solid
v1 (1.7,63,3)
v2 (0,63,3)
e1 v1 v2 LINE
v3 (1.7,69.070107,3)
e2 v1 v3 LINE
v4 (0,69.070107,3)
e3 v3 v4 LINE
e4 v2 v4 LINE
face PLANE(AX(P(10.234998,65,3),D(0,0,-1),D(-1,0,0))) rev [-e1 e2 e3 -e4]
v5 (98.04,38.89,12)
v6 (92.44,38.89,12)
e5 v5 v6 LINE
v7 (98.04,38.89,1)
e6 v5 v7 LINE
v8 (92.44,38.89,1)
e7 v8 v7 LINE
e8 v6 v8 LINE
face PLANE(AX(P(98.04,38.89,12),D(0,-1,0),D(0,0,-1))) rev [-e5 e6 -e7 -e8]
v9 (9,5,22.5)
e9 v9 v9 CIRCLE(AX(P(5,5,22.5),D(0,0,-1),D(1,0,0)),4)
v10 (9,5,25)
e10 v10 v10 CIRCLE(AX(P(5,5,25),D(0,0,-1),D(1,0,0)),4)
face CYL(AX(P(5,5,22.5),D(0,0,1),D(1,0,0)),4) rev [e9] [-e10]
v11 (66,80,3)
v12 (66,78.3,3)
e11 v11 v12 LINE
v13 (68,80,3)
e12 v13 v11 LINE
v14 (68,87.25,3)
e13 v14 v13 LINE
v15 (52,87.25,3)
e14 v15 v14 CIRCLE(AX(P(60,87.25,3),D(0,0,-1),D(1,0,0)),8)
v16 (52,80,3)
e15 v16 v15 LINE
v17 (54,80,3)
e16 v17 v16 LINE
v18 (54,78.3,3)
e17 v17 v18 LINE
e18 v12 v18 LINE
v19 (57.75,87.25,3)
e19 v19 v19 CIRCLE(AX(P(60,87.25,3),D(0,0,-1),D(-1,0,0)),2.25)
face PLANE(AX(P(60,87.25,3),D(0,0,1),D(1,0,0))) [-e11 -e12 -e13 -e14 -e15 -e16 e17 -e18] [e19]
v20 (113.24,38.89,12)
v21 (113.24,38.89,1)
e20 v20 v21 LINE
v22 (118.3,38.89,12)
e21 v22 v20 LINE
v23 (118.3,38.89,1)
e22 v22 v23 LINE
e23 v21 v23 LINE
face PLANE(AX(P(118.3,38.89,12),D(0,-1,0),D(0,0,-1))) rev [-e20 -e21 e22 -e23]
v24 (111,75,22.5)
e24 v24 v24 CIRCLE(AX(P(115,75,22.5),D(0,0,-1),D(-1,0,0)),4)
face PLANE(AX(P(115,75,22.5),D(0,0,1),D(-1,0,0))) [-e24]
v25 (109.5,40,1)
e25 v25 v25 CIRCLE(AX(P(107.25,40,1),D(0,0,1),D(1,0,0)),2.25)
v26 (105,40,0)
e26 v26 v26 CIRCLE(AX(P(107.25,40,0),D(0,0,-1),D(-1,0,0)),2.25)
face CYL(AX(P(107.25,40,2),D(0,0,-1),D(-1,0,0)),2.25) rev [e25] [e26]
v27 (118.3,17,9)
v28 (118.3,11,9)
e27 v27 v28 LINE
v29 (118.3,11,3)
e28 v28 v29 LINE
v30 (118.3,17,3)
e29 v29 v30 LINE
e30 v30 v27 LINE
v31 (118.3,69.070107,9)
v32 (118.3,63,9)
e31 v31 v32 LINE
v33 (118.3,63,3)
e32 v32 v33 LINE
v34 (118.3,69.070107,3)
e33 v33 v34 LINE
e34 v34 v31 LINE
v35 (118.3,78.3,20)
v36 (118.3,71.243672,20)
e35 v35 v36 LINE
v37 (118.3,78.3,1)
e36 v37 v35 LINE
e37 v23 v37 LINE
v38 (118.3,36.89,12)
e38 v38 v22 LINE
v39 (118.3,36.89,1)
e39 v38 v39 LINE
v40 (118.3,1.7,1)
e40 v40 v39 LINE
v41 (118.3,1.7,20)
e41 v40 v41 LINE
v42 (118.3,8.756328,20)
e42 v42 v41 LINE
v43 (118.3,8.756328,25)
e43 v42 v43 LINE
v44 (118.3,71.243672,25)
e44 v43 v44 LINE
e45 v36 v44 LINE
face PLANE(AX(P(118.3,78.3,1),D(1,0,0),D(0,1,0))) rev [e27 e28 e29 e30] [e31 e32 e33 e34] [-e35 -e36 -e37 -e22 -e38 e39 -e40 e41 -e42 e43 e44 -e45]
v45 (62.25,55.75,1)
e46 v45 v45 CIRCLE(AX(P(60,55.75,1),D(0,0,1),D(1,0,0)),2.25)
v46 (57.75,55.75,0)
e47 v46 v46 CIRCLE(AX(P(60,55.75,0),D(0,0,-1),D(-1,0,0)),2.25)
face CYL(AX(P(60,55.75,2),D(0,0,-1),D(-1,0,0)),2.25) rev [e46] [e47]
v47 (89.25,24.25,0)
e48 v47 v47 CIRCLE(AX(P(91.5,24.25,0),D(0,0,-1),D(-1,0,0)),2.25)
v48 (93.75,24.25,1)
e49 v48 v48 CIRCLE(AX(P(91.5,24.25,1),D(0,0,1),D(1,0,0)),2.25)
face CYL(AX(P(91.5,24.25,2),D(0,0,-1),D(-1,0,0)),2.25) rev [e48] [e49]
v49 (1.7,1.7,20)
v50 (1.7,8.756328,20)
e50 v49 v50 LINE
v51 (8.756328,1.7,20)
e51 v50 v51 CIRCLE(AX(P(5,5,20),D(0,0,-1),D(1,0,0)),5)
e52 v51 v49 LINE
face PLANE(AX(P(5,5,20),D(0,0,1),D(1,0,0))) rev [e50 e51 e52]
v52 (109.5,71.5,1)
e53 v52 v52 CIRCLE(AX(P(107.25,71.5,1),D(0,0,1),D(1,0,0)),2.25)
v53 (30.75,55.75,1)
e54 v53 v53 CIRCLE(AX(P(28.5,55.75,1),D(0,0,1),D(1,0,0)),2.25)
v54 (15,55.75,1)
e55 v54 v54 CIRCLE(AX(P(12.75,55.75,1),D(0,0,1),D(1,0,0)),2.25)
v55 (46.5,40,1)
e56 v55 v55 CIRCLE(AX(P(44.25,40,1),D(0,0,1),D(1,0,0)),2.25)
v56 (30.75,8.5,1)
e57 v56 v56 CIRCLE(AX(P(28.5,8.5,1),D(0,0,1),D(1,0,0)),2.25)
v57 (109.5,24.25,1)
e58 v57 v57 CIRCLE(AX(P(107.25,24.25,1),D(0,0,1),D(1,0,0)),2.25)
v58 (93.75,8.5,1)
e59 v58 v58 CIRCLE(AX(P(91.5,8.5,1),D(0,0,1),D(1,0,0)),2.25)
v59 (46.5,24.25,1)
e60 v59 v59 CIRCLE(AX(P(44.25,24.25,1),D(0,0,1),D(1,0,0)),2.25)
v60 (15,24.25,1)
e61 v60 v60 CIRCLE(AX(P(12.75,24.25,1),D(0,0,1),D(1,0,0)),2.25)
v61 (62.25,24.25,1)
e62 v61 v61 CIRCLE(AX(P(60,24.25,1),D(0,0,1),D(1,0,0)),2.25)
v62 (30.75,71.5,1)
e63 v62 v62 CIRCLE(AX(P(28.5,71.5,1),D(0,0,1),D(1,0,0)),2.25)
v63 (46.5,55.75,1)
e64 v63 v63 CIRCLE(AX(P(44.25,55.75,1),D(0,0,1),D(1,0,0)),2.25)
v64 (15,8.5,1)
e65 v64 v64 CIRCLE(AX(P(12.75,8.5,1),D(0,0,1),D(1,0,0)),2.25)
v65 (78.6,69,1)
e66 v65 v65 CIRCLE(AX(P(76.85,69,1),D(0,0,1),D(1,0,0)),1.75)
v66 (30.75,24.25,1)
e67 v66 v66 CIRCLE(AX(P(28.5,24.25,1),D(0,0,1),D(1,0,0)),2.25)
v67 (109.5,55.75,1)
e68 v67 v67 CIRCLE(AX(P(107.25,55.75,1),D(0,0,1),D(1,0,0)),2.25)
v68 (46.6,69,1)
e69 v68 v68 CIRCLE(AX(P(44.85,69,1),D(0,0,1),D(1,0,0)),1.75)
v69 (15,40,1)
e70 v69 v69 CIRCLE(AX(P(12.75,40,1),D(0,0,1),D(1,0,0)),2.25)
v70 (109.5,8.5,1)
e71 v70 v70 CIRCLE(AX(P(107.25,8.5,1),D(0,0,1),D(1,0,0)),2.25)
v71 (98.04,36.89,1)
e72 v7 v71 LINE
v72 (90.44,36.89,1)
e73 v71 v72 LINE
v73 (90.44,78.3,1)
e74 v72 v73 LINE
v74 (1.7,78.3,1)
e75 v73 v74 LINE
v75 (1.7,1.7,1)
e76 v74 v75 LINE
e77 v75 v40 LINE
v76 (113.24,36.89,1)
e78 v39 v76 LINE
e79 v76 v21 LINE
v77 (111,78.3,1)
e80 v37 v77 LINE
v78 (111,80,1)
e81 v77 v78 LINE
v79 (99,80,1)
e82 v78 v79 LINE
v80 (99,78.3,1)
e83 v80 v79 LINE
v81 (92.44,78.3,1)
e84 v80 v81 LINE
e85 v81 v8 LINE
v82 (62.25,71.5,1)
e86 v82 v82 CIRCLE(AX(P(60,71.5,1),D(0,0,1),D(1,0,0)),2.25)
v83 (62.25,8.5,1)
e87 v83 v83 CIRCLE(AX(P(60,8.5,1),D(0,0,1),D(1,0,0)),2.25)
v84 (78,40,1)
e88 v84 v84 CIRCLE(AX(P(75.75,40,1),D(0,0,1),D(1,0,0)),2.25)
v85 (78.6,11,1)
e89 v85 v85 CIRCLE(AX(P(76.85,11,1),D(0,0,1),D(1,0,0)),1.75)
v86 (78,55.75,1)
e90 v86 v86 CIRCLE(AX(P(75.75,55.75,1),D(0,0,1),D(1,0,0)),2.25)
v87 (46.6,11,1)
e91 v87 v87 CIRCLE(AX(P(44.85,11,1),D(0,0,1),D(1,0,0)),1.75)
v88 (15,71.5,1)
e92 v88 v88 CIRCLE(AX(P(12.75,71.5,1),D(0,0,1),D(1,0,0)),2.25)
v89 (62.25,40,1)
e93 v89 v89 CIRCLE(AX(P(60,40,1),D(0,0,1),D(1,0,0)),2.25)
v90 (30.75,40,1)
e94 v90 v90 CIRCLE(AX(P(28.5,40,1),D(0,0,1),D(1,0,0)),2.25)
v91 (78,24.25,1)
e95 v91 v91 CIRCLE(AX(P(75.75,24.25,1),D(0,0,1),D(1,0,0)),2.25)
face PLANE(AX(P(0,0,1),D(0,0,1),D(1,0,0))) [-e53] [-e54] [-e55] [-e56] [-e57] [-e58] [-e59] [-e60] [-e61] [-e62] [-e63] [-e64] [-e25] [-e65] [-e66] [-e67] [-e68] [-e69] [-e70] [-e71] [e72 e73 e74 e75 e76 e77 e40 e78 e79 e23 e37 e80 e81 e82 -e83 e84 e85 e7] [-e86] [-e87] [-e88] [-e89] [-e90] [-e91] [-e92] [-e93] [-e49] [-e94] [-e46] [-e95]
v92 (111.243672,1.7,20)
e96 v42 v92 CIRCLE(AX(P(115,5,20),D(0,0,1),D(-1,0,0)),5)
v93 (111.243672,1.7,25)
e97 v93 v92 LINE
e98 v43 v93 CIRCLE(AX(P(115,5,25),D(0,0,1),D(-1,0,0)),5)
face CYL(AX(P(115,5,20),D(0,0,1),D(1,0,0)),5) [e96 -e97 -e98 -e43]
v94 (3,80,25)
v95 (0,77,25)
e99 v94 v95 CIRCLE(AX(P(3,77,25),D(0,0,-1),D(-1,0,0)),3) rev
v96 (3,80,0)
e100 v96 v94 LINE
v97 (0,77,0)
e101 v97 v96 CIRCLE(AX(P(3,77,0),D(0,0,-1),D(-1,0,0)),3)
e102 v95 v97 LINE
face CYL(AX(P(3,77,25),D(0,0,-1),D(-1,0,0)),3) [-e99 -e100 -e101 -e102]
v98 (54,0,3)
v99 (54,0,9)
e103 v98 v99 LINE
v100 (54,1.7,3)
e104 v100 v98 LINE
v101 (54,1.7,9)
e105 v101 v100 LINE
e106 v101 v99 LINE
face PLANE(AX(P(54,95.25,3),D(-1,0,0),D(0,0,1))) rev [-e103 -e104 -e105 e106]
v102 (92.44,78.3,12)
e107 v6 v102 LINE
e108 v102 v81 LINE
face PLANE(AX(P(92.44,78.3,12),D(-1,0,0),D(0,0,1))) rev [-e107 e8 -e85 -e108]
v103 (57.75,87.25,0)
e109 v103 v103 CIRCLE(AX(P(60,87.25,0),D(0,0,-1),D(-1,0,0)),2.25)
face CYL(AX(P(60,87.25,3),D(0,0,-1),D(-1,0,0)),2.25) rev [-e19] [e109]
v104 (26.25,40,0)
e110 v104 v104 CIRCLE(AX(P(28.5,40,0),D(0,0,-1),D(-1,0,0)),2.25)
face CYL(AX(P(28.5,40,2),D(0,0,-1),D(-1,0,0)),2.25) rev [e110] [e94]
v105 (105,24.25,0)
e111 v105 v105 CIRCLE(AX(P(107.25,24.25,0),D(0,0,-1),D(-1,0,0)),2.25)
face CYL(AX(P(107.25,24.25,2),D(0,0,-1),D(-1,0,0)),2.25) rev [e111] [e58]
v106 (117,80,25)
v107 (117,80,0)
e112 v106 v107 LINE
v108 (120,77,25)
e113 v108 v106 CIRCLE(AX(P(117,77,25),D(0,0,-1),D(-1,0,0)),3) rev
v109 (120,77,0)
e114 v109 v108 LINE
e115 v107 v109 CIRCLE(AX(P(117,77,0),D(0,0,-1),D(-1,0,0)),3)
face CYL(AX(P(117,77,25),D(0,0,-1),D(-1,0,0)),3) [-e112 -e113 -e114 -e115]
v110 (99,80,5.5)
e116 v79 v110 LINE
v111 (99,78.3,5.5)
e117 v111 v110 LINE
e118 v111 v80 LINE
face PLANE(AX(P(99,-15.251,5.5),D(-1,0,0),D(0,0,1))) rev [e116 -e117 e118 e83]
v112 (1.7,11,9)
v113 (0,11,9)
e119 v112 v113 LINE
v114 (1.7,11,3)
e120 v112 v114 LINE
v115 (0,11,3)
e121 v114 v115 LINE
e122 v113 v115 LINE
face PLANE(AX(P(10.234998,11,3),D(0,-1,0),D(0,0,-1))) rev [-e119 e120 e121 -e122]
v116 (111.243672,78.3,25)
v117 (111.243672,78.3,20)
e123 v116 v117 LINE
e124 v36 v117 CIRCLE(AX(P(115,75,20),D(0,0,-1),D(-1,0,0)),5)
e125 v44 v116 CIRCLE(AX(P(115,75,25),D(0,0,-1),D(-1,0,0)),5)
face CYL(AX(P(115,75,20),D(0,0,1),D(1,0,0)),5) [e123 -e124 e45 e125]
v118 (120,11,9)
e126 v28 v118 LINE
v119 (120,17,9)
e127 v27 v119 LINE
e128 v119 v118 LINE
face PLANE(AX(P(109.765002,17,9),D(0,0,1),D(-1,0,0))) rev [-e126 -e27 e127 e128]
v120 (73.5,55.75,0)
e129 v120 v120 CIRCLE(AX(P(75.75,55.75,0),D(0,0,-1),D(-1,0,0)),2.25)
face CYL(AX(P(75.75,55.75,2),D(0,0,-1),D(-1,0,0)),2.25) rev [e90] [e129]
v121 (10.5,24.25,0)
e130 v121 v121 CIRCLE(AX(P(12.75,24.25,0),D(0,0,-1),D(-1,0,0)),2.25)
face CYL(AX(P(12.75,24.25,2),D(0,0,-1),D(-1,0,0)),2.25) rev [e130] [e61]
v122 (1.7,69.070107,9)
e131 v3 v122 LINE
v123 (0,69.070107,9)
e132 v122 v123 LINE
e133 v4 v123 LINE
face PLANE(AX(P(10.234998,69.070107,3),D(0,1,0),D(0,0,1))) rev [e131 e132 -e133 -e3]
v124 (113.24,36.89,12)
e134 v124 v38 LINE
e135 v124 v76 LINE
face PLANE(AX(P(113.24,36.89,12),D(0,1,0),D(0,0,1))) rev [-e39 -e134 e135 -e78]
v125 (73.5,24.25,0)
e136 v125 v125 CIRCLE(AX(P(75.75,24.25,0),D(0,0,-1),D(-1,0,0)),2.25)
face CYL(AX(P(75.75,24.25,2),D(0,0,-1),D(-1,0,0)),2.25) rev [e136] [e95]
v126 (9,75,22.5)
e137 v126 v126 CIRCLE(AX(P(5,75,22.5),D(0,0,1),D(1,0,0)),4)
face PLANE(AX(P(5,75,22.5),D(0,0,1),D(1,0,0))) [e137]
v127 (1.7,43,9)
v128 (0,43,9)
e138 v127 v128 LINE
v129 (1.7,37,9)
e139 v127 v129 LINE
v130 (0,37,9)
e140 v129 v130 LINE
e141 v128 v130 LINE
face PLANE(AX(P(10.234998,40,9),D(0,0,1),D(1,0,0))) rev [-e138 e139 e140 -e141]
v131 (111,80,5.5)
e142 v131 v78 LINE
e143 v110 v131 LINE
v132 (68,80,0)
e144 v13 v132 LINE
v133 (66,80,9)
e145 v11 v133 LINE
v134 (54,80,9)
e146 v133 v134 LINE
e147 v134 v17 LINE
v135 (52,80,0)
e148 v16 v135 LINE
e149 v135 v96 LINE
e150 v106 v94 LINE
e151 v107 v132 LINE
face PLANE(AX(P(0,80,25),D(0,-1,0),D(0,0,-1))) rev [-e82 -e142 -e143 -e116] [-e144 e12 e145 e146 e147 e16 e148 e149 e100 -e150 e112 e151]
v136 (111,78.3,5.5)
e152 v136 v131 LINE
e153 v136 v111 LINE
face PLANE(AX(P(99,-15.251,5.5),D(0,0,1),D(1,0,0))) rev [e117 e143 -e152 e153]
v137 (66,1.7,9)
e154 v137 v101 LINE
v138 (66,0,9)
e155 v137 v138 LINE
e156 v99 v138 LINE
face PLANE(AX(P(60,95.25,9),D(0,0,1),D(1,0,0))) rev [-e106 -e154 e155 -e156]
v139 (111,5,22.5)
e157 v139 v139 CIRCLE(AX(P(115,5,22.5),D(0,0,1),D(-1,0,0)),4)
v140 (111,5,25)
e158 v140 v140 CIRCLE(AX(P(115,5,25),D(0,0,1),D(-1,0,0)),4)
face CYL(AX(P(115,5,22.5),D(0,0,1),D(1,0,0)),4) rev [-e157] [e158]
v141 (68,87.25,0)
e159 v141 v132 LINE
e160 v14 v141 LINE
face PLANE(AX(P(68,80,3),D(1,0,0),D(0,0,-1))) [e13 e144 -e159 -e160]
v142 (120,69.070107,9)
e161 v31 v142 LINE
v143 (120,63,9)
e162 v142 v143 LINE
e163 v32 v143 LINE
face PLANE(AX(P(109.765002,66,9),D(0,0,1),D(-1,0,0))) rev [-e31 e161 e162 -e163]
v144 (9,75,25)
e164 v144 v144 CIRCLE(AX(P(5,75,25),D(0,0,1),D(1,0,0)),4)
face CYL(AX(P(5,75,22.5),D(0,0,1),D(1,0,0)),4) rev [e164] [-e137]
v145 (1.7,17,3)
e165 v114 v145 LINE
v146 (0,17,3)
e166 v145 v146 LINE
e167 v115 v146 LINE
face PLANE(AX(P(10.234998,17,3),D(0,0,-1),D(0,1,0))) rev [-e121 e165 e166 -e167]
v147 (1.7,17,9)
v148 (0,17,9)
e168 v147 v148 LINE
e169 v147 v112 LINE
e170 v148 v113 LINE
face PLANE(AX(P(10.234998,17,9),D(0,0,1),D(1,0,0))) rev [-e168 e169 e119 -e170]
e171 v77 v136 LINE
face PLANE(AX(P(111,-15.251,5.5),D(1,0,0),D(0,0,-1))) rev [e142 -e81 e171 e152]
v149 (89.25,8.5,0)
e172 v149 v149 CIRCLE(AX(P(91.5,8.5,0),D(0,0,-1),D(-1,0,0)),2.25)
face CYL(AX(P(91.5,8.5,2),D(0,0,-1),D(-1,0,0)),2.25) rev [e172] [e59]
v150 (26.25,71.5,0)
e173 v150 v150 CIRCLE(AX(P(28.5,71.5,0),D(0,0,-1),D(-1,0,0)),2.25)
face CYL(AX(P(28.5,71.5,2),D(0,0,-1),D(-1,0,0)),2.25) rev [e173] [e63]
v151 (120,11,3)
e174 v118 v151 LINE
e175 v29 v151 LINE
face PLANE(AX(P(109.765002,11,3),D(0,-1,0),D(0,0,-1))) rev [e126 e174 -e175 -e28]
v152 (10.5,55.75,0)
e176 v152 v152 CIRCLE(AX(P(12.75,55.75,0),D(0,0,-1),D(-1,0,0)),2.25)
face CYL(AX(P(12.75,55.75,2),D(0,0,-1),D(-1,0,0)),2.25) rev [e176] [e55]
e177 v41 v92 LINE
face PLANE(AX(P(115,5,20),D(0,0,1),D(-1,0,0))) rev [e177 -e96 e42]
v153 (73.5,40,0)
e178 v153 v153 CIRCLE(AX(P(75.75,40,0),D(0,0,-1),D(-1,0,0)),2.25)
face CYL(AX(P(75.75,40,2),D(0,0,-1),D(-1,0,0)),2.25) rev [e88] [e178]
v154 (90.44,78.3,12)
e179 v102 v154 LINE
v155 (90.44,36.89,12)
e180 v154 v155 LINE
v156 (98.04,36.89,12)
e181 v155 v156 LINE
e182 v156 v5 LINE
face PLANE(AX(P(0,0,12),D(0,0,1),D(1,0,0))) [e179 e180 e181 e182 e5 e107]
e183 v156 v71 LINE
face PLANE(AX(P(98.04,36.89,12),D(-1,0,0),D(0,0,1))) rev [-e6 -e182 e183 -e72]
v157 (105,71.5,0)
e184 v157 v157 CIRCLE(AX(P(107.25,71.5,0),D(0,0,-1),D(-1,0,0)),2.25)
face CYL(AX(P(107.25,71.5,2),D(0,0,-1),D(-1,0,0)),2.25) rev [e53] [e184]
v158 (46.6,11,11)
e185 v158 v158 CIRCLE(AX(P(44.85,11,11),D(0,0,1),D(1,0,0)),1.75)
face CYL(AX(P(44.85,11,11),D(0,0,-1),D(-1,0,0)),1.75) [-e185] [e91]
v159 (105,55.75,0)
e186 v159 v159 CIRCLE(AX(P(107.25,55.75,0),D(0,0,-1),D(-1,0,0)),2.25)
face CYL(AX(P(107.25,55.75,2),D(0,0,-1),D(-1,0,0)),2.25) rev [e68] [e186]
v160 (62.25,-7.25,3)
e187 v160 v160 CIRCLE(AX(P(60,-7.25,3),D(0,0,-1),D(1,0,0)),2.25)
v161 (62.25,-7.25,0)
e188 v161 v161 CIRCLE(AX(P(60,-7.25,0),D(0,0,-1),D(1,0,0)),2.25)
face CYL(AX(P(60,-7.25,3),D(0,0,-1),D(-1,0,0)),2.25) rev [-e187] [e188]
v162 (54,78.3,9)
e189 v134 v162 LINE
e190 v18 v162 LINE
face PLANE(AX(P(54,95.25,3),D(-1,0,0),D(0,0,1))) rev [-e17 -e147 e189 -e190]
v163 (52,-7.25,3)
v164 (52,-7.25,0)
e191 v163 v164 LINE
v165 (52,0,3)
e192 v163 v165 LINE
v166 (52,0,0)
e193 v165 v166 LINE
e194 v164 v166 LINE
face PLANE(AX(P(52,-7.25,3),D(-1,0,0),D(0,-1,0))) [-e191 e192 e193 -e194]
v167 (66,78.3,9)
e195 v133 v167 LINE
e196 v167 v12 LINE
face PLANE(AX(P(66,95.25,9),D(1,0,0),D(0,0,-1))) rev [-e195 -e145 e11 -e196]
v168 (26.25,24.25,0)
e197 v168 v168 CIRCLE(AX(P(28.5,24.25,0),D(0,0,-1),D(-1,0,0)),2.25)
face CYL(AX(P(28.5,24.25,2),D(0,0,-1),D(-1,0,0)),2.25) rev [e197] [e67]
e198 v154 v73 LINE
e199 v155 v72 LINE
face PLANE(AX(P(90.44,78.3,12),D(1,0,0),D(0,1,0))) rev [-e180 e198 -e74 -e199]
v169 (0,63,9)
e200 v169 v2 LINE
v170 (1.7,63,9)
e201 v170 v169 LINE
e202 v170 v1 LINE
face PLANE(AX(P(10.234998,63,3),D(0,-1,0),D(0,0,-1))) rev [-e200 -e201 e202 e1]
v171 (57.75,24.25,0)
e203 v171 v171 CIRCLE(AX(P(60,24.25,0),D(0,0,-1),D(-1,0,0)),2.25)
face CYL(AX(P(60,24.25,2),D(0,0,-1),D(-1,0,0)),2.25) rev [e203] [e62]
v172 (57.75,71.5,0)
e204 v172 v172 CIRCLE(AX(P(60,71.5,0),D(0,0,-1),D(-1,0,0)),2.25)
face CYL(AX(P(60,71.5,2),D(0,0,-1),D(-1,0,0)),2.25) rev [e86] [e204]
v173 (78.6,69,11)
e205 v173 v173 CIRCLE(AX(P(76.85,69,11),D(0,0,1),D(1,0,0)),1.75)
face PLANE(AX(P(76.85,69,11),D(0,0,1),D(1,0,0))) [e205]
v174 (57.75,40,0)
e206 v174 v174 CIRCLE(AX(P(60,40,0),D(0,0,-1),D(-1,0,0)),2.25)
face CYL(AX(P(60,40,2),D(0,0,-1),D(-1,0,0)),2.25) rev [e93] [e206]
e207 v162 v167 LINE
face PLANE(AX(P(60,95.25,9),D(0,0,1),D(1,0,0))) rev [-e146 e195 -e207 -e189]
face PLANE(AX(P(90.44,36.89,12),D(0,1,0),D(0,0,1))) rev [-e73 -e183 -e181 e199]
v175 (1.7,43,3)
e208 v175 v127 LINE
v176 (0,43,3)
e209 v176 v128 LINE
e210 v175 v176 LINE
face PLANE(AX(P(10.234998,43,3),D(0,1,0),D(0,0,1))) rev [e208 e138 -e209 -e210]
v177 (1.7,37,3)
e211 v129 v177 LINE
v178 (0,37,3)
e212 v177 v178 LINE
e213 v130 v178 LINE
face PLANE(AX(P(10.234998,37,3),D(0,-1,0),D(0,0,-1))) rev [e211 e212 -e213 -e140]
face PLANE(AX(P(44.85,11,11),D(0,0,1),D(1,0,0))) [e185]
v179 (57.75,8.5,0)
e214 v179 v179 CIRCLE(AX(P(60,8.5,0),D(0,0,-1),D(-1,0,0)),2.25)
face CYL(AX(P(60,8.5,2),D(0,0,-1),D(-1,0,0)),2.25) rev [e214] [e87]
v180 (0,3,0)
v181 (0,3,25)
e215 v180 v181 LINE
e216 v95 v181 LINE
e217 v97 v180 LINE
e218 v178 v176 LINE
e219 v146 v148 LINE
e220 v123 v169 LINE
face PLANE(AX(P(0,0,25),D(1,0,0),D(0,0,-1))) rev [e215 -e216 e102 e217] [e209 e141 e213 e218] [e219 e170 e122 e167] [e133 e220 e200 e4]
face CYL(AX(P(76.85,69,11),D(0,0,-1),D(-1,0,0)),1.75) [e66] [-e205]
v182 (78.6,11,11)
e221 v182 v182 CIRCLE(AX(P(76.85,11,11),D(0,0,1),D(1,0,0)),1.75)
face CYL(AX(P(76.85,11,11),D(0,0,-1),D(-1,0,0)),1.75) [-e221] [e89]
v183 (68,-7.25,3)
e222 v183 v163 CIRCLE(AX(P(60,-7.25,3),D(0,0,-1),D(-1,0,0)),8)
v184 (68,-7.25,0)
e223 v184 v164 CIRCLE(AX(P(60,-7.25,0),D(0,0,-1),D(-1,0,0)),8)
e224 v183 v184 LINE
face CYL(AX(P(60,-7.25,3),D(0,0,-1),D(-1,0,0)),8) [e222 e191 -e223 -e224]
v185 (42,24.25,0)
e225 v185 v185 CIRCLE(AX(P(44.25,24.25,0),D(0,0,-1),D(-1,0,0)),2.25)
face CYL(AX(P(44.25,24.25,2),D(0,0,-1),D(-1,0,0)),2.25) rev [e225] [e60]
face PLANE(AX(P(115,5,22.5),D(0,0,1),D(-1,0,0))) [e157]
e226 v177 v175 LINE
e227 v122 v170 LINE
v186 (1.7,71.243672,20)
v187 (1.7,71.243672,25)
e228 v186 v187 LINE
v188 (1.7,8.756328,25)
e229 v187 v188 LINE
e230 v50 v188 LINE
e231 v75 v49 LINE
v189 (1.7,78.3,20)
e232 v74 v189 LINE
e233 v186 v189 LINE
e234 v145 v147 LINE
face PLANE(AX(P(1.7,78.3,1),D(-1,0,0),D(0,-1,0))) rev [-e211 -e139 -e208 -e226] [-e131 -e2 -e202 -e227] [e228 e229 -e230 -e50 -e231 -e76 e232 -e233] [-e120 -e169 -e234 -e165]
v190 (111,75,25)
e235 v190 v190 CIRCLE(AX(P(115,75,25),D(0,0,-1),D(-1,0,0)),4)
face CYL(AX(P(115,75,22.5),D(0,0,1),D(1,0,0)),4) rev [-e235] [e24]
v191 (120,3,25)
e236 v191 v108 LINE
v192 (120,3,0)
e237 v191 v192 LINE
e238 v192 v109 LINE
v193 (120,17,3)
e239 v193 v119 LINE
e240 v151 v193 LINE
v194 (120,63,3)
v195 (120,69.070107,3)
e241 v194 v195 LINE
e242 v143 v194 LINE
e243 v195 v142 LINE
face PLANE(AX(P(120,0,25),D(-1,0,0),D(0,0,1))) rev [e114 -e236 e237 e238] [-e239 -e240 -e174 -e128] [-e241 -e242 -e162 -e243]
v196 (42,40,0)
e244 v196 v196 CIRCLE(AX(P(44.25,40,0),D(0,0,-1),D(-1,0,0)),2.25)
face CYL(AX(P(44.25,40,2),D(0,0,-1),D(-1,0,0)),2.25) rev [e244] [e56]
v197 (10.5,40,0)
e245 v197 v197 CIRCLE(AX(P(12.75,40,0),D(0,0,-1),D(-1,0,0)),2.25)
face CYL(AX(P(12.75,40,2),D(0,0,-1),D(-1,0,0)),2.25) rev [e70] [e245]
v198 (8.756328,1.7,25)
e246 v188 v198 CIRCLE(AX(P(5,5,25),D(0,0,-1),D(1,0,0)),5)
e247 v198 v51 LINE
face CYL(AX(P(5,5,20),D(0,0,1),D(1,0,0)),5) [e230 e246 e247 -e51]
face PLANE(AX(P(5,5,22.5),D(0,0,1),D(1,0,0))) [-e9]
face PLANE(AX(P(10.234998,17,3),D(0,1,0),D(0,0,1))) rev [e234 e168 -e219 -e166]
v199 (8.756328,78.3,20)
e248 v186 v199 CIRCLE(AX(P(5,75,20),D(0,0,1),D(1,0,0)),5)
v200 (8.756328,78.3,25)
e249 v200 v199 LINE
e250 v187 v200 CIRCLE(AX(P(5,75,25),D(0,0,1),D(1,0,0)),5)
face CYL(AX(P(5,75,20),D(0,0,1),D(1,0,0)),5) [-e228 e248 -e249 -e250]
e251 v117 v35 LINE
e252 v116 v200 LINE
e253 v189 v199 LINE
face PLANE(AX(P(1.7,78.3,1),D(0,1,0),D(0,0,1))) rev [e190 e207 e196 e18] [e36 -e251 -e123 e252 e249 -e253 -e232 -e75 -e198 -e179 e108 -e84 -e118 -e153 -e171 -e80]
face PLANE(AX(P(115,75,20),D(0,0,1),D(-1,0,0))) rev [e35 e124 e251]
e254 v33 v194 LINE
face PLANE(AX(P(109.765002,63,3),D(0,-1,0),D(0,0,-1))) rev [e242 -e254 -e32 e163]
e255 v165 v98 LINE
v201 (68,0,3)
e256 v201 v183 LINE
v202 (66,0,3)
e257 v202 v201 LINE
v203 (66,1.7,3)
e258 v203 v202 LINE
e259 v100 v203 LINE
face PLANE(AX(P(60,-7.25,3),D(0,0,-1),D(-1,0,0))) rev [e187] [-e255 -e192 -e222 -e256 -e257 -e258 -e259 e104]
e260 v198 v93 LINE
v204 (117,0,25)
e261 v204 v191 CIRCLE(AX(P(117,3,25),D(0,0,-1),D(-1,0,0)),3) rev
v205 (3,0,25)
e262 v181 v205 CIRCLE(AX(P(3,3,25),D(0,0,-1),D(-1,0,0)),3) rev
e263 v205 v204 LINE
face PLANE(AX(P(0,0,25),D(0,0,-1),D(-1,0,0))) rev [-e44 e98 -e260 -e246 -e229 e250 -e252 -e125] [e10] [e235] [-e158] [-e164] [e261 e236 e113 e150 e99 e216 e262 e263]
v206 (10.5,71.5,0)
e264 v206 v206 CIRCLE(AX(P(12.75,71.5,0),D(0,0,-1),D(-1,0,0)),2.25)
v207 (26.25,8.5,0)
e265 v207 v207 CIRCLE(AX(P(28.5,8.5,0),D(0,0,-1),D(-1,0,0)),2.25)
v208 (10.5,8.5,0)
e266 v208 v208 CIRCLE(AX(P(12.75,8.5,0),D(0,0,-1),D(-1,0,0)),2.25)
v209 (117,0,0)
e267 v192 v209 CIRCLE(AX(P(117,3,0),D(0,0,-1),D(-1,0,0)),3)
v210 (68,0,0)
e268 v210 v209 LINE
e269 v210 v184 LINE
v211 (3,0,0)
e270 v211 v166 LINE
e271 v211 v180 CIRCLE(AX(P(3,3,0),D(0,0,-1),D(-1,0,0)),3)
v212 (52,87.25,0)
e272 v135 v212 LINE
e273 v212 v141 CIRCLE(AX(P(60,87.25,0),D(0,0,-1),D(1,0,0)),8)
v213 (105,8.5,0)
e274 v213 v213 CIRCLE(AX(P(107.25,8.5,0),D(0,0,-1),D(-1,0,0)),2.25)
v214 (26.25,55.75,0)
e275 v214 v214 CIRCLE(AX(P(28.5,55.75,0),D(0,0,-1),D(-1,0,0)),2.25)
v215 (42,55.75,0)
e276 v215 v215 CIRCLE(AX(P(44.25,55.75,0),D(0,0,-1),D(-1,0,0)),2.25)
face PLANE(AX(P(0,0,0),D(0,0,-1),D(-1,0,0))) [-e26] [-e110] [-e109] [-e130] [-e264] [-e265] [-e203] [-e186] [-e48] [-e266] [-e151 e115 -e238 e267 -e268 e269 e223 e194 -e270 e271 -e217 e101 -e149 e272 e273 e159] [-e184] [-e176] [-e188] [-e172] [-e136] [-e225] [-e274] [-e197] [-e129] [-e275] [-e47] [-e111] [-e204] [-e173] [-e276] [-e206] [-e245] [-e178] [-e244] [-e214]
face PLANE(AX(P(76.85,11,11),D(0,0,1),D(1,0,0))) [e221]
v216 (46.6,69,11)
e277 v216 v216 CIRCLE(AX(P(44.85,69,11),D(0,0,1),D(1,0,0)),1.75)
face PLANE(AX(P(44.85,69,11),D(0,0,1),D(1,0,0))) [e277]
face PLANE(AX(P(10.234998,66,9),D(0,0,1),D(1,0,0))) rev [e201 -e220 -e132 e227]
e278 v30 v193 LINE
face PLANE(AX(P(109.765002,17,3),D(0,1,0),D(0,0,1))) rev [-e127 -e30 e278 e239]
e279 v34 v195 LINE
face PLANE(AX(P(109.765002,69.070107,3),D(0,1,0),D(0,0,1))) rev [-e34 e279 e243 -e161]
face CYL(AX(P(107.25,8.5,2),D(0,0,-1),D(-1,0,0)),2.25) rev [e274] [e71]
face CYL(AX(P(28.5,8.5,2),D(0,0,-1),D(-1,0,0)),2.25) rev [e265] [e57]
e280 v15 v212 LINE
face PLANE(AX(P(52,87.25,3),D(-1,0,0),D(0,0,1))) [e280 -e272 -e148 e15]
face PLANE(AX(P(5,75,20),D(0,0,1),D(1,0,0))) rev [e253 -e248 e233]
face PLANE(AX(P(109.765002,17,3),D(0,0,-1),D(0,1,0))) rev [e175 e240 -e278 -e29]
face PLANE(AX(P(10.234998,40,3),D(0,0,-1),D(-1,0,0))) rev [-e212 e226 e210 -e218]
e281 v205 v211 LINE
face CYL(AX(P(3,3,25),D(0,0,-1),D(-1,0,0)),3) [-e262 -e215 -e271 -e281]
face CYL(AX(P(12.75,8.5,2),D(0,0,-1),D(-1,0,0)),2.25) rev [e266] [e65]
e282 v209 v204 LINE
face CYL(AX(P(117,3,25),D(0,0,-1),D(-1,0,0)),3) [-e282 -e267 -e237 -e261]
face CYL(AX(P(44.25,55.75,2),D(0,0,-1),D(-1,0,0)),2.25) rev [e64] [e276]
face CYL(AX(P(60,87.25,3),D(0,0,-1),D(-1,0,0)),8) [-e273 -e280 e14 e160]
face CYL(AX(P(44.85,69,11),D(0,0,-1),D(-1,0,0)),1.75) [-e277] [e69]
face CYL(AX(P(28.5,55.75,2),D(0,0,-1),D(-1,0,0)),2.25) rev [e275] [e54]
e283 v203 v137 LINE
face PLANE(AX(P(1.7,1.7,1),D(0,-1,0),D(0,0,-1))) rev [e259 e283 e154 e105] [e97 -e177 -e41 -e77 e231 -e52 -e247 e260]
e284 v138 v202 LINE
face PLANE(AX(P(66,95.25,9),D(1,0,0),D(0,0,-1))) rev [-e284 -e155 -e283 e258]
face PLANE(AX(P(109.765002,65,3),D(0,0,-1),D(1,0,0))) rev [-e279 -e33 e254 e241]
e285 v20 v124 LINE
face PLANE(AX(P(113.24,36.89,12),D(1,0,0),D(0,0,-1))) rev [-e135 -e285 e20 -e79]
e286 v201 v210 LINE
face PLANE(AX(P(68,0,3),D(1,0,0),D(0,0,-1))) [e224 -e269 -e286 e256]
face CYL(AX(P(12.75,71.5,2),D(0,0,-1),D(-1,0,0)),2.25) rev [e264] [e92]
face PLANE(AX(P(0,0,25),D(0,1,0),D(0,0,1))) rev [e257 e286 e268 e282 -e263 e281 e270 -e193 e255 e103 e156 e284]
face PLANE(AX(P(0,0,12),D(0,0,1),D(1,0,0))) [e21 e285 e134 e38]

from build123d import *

# Parameters (mm, degrees)
SKETCH1_W               = 120
SKETCH1_H               = 80
BOSS_EXTRUDE1_DEPTH     = 25
SKETCH2_W               = 116.6
SKETCH2_H               = 76.6
CUT_EXTRUDE1_DEPTH      = 24
SKETCH4_R               = 2.25
BOSS_EXTRUDE3_DEPTH     = 3
SKETCH6_W               = 5.06
SKETCH6_H               = 2
BOSS_EXTRUDE4_DEPTH     = 12
SKETCH7_R               = 1.75
BOSS_EXTRUDE5_DEPTH     = 10
SKETCH8_R               = 5
BOSS_EXTRUDE6_DEPTH     = 5
SKETCH9_R               = 4
CUT_EXTRUDE2_DEPTH      = 2.5
MIRROR2_COPY_1_SKETCH_R = 5
MIRROR2_COPY_1_DEPTH    = 5
MIRROR2_COPY_2_SKETCH_R = 4
MIRROR2_COPY_2_DEPTH    = 2.5
FILLET1_R               = 3
SKETCH10_R              = 2.25
CUT_EXTRUDE3_DEPTH      = 2
CUT_EXTRUDE4_REACH      = 157.234
SKETCH11_W              = 12
SKETCH11_H              = 4.5
CUT_EXTRUDE5_DEPTH      = 156.233896105
CUT_EXTRUDE5_DEPTH_BACK = 156.233896105
CUT_EXTRUDE6_START      = -1.7
CUT_EXTRUDE6_DEPTH      = 157.933896105
MIRROR3_START           = 3
MIRROR3_OUTLINE_W       = 1.7
MIRROR3_OUTLINE_H       = 6.070107007
MIRROR3_OUTLINE_H_2     = 6
MIRROR3_DEPTH           = 6


# Read off the part's stored shape, not the designer's step: Mirror3
with BuildPart() as part:
    # Sketch1 → Boss-Extrude1 (new body)
    with BuildSketch(Plane.XY):
        with Locations((60, 40)):
            Rectangle(SKETCH1_W, SKETCH1_H)
    extrude(amount=BOSS_EXTRUDE1_DEPTH)

    # Sketch2 → Cut-Extrude1 (cut)
    with BuildSketch(Plane.XY.offset(25)):
        with Locations((60, 40)):
            Rectangle(SKETCH2_W, SKETCH2_H)
    extrude(amount=-CUT_EXTRUDE1_DEPTH, mode=Mode.SUBTRACT)

    # Sketch4 → Boss-Extrude3 (add)
    # profile 1 of 2: a face of its own
    with BuildSketch(Plane(origin=(0, 0, 0), x_dir=(-1, 0, 0), z_dir=(0, 0, -1))):
        with BuildLine():
            Line((-68, 80), (-68, 87.25))
            ThreePointArc((-68, 87.25), (-60, 95.25), (-52, 87.25))
            Line((-52, 87.25), (-52, 80))
            Line((-52, 80), (-68, 80))
        make_face()
        with Locations((-60, 87.25)):
            Circle(SKETCH4_R, mode=Mode.SUBTRACT)
    # profile 2 of 2: a face of its own
    with BuildSketch(Plane(origin=(0, 0, 0), x_dir=(-1, 0, 0), z_dir=(0, 0, -1))):
        with BuildLine():
            Line((-68, 0), (-68, -7.25))
            ThreePointArc((-68, -7.25), (-60, -15.25), (-52, -7.25))
            Line((-52, -7.25), (-52, 0))
            Line((-52, 0), (-68, 0))
        make_face()
        with Locations(Location((-60, -7.25, 0), (0, 0, 180))):
            Circle(SKETCH4_R, mode=Mode.SUBTRACT)
    extrude(amount=-BOSS_EXTRUDE3_DEPTH)

    # Sketch6 → Boss-Extrude4 (add)
    with BuildSketch(Plane.XY):
        Polygon((90.44, 78.3), (92.44, 78.3), (92.44, 38.89), (98.04, 38.89), (98.04, 36.89), (90.44, 36.89), align=None)
        with Locations((115.77, 37.89)):
            Rectangle(SKETCH6_W, SKETCH6_H)
    extrude(amount=BOSS_EXTRUDE4_DEPTH)

    # Sketch7 → Boss-Extrude5 (add)
    with BuildSketch(Plane.XY.offset(1)):
        with Locations((44.85, 69)):
            Circle(SKETCH7_R)
        with Locations((44.85, 11)):
            Circle(SKETCH7_R)
        with Locations((76.85, 69)):
            Circle(SKETCH7_R)
        with Locations((76.85, 11)):
            Circle(SKETCH7_R)
    extrude(amount=BOSS_EXTRUDE5_DEPTH)

    # Sketch8 → Boss-Extrude6 (add)
    with BuildSketch(Plane.XY.offset(25)):
        with Locations((5, 75)):
            Circle(SKETCH8_R)
    boss_extrude6 = extrude(amount=-BOSS_EXTRUDE6_DEPTH)

    # Sketch9 → Cut-Extrude2 (cut)
    with BuildSketch(Plane.XY.offset(25)):
        with Locations((5, 75)):
            Circle(SKETCH9_R)
    cut_extrude2 = extrude(amount=-CUT_EXTRUDE2_DEPTH, mode=Mode.SUBTRACT)

    # Mirror1: Boss-Extrude6, Cut-Extrude2 across plane
    add(boss_extrude6.mirror(Plane.ZY.offset(-60)))
    add(cut_extrude2.mirror(Plane.ZY.offset(-60)), mode=Mode.SUBTRACT)

    # Mirror2: Boss-Extrude6, Cut-Extrude2 across plane
    add(boss_extrude6.mirror(Plane.ZX.offset(40)))
    add(cut_extrude2.mirror(Plane.ZX.offset(40)), mode=Mode.SUBTRACT)

    # Mirror2 copy 1 sketch → Mirror2 copy 1 (add)
    with BuildSketch(Plane(origin=(120, 80, 25), x_dir=(-1, 0, 0), z_dir=(0, 0, 1))):
        with Locations((5, 75)):
            Circle(MIRROR2_COPY_1_SKETCH_R)
    extrude(amount=-MIRROR2_COPY_1_DEPTH)

    # Mirror2 copy 2 sketch → Mirror2 copy 2 (cut)
    with BuildSketch(Plane(origin=(120, 80, 25), x_dir=(-1, 0, 0), z_dir=(0, 0, 1))):
        with Locations((5, 75)):
            Circle(MIRROR2_COPY_2_SKETCH_R)
    extrude(amount=-MIRROR2_COPY_2_DEPTH, mode=Mode.SUBTRACT)

    # Fillet1
    fillet1_edges = [part.edges().sort_by_distance(p)[0] for p in [
        (0, 80, 12.5),
        (120, 80, 12.5),
        (120, 0, 12.5),
        (0, 0, 12.5),
    ]]
    fillet(fillet1_edges, radius=FILLET1_R)

    # Sketch10 → Cut-Extrude3 (cut)
    with BuildSketch(Plane(origin=(0, 0, 0), x_dir=(-1, 0, 0), z_dir=(0, 0, -1))):
        with Locations((-28.5, 71.5)):
            Circle(SKETCH10_R)
        with Locations((-12.75, 55.75)):
            Circle(SKETCH10_R)
        with Locations((-28.5, 55.75)):
            Circle(SKETCH10_R)
        with Locations((-12.75, 40)):
            Circle(SKETCH10_R)
        with Locations((-28.5, 40)):
            Circle(SKETCH10_R)
        with Locations((-44.25, 40)):
            Circle(SKETCH10_R)
        with Locations((-12.75, 24.25)):
            Circle(SKETCH10_R)
        with Locations((-28.5, 24.25)):
            Circle(SKETCH10_R)
        with Locations((-44.25, 24.25)):
            Circle(SKETCH10_R)
        with Locations((-12.75, 8.5)):
            Circle(SKETCH10_R)
        with BuildLine():
            ThreePointArc((-57.75, 24.25), (-58.409009742, 25.840990258), (-60, 26.5))
            Line((-60, 26.5), (-60, 22))
            ThreePointArc((-60, 22), (-58.409009742, 22.659009742), (-57.75, 24.25))
        make_face()
        with BuildLine():
            Line((-60, 22), (-60, 26.5))
            ThreePointArc((-60, 26.5), (-62.25, 24.25), (-60, 22))
        make_face()
        with BuildLine():
            ThreePointArc((-57.75, 8.5), (-58.409009742, 10.090990258), (-60, 10.75))
            Line((-60, 10.75), (-60, 6.25))
            ThreePointArc((-60, 6.25), (-58.409009742, 6.909009742), (-57.75, 8.5))
        make_face()
        with BuildLine():
            Line((-60, 6.25), (-60, 10.75))
            ThreePointArc((-60, 10.75), (-62.25, 8.5), (-60, 6.25))
        make_face()
        with BuildLine():
            ThreePointArc((-57.75, 40), (-58.409009742, 41.590990258), (-60, 42.25))
            Line((-60, 42.25), (-60, 37.75))
            ThreePointArc((-60, 37.75), (-58.409009742, 38.409009742), (-57.75, 40))
        make_face()
        with BuildLine():
            Line((-60, 37.75), (-60, 42.25))
            ThreePointArc((-60, 42.25), (-62.25, 40), (-60, 37.75))
        make_face()
        with BuildLine():
            ThreePointArc((-57.75, 55.75), (-58.409009742, 57.340990258), (-60, 58))
            Line((-60, 58), (-60, 53.5))
            ThreePointArc((-60, 53.5), (-58.409009742, 54.159009742), (-57.75, 55.75))
        make_face()
        with BuildLine():
            Line((-60, 53.5), (-60, 58))
            ThreePointArc((-60, 58), (-62.25, 55.75), (-60, 53.5))
        make_face()
        with BuildLine():
            ThreePointArc((-57.75, 71.5), (-58.409009742, 73.090990258), (-60, 73.75))
            Line((-60, 73.75), (-60, 69.25))
            ThreePointArc((-60, 69.25), (-58.409009742, 69.909009742), (-57.75, 71.5))
        make_face()
        with BuildLine():
            Line((-60, 69.25), (-60, 73.75))
            ThreePointArc((-60, 73.75), (-62.25, 71.5), (-60, 69.25))
        make_face()
        with Locations((-75.75, 24.25)):
            Circle(SKETCH10_R)
        with Locations((-75.75, 55.75)):
            Circle(SKETCH10_R)
        with Locations((-75.75, 40)):
            Circle(SKETCH10_R)
        with Locations((-91.5, 24.25)):
            Circle(SKETCH10_R)
        with Locations((-107.25, 24.25)):
            Circle(SKETCH10_R)
        with Locations((-107.25, 8.5)):
            Circle(SKETCH10_R)
        with Locations((-107.25, 55.75)):
            Circle(SKETCH10_R)
        with Locations((-107.25, 40)):
            Circle(SKETCH10_R)
        with Locations((-12.75, 71.5)):
            Circle(SKETCH10_R)
        with Locations((-44.25, 55.75)):
            Circle(SKETCH10_R)
        with Locations((-28.5, 8.5)):
            Circle(SKETCH10_R)
        with Locations((-60, 8.5)):
            Circle(SKETCH10_R)
        with Locations((-91.5, 8.5)):
            Circle(SKETCH10_R)
        with Locations((-107.25, 71.5)):
            Circle(SKETCH10_R)
    extrude(amount=-CUT_EXTRUDE3_DEPTH, mode=Mode.SUBTRACT)

    # Sketch11 → Cut-Extrude4 (cut, up to next)
    with BuildSketch(Plane(origin=(0, 80, 0), x_dir=(1, 0, 0), z_dir=(0, 1, 0)), mode=Mode.PRIVATE) as cut_extrude4_sk1:
        with Locations((105, -3.25)):
            Rectangle(SKETCH11_W, SKETCH11_H)
    cut_extrude4_tool1 = extrude(cut_extrude4_sk1.sketch, amount=-CUT_EXTRUDE4_REACH, mode=Mode.PRIVATE) & part.part
    add(cut_extrude4_tool1.solids().sort_by_distance((105, 80, 3.25))[0], mode=Mode.SUBTRACT)

    # Sketch12 → Cut-Extrude5 (cut, two sides: drawn at the far end of the back side and taken through both)
    with BuildSketch(Plane.XZ.offset(-CUT_EXTRUDE5_DEPTH_BACK)):
        Polygon((60, 3), (54, 3), (54, 9), (60, 9), (66, 9), (66, 3), align=None)
    extrude(amount=CUT_EXTRUDE5_DEPTH + CUT_EXTRUDE5_DEPTH_BACK, mode=Mode.SUBTRACT)

    # Sketch13 → Cut-Extrude6 (cut)
    with BuildSketch(Plane.ZY.offset(CUT_EXTRUDE6_START)):
        Polygon((3, 40), (3, 43), (9, 43), (9, 40), (9, 37), (3, 37), align=None)
        Polygon((3, 65), (3, 69.070107007), (9, 69.070107007), (9, 66), (9, 63), (3, 63), align=None)
        Polygon((3, 17), (3, 11), (9, 11), (9, 15.086809652), (9, 17), align=None)
    extrude(amount=CUT_EXTRUDE6_DEPTH, mode=Mode.SUBTRACT)

    # Mirror3 outline → Mirror3 (cut)
    with BuildSketch(Plane.XY.offset(MIRROR3_START)):
        with Locations((119.15, 66.035053504)):
            Rectangle(MIRROR3_OUTLINE_W, MIRROR3_OUTLINE_H)
        with Locations((119.15, 14)):
            Rectangle(MIRROR3_OUTLINE_W, MIRROR3_OUTLINE_H_2)
    extrude(amount=MIRROR3_DEPTH, mode=Mode.SUBTRACT)


solid = part.part
